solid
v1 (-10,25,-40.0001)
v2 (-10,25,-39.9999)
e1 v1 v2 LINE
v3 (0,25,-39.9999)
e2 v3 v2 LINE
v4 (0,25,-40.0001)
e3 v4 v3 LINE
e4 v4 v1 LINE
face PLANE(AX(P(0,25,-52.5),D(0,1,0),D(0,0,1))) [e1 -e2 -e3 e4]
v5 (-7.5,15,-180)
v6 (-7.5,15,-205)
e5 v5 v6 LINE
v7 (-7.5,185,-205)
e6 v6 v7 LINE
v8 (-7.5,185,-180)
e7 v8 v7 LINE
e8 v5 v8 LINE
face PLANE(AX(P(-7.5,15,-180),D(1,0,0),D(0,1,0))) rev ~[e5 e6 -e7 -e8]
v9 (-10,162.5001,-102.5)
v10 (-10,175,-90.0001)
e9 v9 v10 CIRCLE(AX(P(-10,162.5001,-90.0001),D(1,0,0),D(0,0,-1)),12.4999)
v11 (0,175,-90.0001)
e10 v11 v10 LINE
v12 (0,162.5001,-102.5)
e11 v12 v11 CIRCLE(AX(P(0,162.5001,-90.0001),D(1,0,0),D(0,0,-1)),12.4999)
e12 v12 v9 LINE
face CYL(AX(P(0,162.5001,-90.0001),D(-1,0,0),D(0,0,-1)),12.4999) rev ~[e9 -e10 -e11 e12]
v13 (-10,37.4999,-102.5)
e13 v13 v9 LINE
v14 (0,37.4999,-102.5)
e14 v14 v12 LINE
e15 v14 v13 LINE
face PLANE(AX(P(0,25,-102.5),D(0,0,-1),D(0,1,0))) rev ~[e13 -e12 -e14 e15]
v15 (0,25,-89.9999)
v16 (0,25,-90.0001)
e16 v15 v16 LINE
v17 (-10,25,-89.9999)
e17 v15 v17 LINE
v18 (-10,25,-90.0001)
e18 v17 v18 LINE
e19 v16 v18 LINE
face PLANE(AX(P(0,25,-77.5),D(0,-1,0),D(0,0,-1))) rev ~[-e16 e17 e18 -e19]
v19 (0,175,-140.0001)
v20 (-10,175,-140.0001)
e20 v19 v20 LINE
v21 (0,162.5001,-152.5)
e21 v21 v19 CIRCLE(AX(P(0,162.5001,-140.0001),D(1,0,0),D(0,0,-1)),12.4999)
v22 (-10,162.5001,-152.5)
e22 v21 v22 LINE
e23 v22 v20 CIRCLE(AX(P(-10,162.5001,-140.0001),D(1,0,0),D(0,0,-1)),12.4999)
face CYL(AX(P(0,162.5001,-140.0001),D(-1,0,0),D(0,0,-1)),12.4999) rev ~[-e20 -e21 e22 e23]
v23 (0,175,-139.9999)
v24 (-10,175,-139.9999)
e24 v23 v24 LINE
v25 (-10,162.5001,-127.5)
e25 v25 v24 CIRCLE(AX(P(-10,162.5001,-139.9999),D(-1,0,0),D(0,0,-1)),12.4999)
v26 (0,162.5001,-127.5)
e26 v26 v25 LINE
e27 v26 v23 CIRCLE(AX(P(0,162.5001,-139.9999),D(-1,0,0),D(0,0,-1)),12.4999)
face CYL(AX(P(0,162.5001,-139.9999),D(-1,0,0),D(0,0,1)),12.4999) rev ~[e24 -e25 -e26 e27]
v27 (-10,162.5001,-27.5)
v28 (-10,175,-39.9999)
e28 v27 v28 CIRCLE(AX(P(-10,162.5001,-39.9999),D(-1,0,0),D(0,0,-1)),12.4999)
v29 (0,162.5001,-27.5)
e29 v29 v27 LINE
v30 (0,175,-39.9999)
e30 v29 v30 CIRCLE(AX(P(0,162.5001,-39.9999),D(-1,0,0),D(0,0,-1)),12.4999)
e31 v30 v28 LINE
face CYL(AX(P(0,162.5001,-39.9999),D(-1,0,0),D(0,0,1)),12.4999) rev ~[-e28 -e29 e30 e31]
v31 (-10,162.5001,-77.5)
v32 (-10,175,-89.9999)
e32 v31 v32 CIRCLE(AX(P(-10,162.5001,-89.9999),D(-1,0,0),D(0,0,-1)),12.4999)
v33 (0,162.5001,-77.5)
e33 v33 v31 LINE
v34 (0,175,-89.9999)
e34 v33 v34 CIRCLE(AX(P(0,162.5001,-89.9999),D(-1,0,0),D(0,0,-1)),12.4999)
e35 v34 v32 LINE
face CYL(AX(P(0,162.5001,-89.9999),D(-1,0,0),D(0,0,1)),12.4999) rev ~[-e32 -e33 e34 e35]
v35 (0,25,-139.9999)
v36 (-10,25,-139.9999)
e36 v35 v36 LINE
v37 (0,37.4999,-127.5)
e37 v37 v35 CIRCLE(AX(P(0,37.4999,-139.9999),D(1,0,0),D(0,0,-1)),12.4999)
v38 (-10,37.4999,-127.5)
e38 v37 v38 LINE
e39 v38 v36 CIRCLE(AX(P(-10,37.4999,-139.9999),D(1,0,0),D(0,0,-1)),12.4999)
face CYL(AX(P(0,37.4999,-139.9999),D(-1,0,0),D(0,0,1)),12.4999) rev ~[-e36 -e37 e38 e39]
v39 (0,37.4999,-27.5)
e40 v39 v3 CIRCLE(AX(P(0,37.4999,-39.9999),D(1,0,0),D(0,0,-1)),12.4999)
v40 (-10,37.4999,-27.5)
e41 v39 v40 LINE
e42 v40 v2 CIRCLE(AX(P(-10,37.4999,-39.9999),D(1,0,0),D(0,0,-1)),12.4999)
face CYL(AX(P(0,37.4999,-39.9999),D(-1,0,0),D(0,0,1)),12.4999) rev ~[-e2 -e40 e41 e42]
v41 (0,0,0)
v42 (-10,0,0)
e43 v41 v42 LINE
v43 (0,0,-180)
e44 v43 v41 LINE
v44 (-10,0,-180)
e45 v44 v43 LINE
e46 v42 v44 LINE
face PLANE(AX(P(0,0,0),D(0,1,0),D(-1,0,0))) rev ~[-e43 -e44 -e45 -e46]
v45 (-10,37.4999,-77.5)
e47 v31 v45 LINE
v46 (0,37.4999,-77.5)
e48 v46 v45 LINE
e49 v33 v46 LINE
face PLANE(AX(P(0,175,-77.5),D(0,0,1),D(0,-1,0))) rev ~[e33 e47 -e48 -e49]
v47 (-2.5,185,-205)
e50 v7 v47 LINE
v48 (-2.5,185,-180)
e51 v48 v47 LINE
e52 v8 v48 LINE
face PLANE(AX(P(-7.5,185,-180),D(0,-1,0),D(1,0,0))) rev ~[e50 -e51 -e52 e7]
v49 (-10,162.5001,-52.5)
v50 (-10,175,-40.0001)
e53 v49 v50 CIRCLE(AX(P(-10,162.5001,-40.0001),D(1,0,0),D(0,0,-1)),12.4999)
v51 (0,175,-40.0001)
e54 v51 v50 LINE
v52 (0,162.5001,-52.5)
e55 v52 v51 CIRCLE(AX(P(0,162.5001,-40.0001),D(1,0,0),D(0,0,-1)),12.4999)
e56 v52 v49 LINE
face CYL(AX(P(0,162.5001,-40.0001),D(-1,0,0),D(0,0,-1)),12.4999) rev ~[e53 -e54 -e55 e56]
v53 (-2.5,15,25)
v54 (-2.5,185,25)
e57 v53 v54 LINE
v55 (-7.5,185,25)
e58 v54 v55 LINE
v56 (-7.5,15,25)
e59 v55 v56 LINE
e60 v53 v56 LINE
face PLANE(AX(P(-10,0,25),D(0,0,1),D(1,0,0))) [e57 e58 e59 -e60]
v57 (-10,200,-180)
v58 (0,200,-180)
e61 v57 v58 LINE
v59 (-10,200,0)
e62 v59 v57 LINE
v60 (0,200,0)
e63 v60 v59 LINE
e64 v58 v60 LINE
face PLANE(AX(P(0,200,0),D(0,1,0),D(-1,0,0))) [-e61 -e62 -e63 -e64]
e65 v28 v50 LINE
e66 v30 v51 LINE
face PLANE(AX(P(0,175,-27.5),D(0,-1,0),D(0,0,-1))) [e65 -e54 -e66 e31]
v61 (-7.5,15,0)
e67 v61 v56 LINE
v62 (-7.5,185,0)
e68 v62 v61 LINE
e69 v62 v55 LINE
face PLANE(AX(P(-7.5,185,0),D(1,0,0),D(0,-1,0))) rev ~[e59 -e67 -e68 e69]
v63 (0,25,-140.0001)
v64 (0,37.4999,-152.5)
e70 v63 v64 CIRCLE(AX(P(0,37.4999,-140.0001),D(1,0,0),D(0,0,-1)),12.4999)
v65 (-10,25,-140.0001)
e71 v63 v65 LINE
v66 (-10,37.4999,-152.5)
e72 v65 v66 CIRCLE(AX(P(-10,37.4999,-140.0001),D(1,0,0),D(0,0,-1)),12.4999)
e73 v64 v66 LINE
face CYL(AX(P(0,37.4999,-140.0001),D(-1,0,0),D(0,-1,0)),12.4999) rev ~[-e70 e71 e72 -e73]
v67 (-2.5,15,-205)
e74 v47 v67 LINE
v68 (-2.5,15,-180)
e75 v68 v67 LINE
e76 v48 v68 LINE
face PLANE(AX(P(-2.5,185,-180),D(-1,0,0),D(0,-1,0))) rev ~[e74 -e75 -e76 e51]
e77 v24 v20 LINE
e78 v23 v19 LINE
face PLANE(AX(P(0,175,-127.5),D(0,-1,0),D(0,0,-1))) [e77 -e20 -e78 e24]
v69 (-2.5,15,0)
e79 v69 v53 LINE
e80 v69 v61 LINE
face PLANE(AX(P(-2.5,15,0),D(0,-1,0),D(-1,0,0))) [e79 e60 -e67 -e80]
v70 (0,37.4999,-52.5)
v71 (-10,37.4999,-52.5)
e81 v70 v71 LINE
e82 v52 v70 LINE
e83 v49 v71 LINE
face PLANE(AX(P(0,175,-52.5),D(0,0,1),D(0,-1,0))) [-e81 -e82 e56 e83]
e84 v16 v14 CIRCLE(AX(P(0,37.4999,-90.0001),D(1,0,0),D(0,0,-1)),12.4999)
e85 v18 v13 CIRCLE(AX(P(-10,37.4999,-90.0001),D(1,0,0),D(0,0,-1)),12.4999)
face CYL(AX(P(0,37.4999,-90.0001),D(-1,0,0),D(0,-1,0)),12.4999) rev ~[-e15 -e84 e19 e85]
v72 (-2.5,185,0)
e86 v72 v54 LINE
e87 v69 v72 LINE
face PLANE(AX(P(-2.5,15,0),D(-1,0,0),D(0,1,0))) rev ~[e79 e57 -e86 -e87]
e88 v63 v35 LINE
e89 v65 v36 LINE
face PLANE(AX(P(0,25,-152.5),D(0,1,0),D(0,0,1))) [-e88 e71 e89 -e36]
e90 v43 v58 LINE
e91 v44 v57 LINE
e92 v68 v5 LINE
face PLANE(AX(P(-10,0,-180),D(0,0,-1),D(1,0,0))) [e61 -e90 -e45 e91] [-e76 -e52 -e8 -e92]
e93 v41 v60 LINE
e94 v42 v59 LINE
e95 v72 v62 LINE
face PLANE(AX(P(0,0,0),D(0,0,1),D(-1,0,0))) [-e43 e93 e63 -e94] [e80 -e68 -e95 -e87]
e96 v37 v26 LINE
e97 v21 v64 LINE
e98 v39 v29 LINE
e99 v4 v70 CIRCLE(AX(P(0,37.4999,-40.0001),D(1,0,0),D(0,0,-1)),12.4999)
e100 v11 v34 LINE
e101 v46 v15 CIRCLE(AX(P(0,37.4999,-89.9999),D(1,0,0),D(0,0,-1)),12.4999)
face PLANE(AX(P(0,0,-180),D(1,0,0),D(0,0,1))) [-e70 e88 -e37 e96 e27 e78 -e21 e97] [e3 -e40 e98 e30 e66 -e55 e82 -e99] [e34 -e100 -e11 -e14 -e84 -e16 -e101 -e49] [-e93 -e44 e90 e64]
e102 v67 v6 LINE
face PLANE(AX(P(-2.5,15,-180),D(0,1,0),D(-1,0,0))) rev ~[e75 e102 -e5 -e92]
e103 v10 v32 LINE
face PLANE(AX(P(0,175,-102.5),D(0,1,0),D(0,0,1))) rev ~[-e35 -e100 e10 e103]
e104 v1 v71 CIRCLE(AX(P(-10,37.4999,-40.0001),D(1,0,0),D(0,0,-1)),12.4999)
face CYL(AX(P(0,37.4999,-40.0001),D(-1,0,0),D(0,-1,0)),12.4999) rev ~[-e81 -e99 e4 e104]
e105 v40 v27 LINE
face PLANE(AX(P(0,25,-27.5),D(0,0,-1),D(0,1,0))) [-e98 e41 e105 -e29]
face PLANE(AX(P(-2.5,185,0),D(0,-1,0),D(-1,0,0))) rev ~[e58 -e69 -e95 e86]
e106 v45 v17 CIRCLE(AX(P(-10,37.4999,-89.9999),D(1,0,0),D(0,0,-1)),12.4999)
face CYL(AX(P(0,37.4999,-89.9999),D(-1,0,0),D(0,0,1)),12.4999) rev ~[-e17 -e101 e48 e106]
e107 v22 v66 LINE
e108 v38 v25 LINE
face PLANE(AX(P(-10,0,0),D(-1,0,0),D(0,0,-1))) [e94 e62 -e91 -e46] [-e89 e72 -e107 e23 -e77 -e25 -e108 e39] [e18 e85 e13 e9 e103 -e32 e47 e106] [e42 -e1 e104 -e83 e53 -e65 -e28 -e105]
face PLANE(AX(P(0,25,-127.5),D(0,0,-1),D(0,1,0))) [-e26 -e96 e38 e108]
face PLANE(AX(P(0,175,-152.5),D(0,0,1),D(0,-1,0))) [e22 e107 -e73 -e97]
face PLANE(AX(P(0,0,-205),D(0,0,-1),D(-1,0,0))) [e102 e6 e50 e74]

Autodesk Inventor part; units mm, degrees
ref_plane "YZ Plane" through (0, 0, 0) normal (1, 0, 0) x (0, 1, 0)
ref_plane "XZ Plane" through (0, 0, 0) normal (0, 1, 0) x (-1, 0, 0)
ref_plane "XY Plane" through (0, 0, 0) normal (0, 0, 1) x (1, 0, 0)
sketch "Sketch1" plane through (0, 0, 0) normal (0, 1, 0) x (-1, 0, 0)
  line L0 (0, 0) -> (10, 0)
  line L1 (10, 0) -> (10, -180)
  line L2 (10, -180) -> (0, -180)
  line L3 (0, -180) -> (0, 0)
  dimension "d0" = 10
  dimension "d1" = 180
extrude "Extrusion1" add sketch "Sketch1" along normal blind 200
sketch "Sketch2" plane through (-10, 0, 0) normal (0, 0, 1) x (1, 0, 0)
  line L0 (10, 0) -> (0, 0) projected
  line L1 (10, 200) -> (0, 200) projected
  line L2 (2.5, 0) -> (7.5, 0)
  line L3 (7.5, 0) -> (7.5, 200)
  line L4 (7.5, 200) -> (2.5, 200)
  line L5 (2.5, 200) -> (2.5, 0)
  line L6 (10, 0) -> (10, 200) projected
  line L7 (0, 200) -> (10, 200)
  line L8 (10, 200) -> (10, 185)
  line L9 (10, 185) -> (0, 185)
  line L10 (0, 185) -> (0, 200)
  line L11 (0, 0) -> (10, 0)
  line L12 (10, 0) -> (10, 15)
  line L13 (10, 15) -> (0, 15)
  line L14 (0, 15) -> (0, 0)
  point P0 (2.5, 15)
  point P1 (7.5, 15)
  point P2 (7.5, 185)
  point P3 (2.5, 185)
  dimension "d4" = 5
  dimension "d5" = 15
  dimension "d6" = 15
extrude "Extrusion2" add sketch "Sketch2" along normal blind 25 contours L13 L5 L9 L3
sketch "Sketch3" plane through (0, 0, -180) normal (0, 0, -1) x (-1, 0, 0)
  line L0 (2.5, 15) -> (7.5, 15)
  line L1 (7.5, 15) -> (7.5, 185)
  line L2 (7.5, 185) -> (2.5, 185)
  line L3 (2.5, 185) -> (2.5, 15)
  point P0 (0, 0)
  dimension "d9" = 5
  dimension "d10" = 170
extrude "Extrusion3" add sketch "Sketch3" along normal blind 25
sketch "Sketch4" plane through (0, 0, 0) normal (1, 0, 0) x (0, 0, -1)
  line L0 (27.5, 175) -> (52.5, 175)
  line L1 (52.5, 175) -> (52.5, 25)
  line L2 (52.5, 25) -> (27.5, 25)
  line L3 (27.5, 25) -> (27.5, 175)
  line L4 (77.5, 25) -> (102.5, 25)
  line L5 (102.5, 25) -> (102.5, 175)
  line L6 (102.5, 175) -> (77.5, 175)
  line L7 (77.5, 175) -> (77.5, 25)
  line L8 (127.5, 175) -> (152.5, 175)
  line L9 (152.5, 175) -> (152.5, 25)
  line L10 (152.5, 25) -> (127.5, 25)
  line L11 (127.5, 25) -> (127.5, 175)
  point P0 (0, 0)
  dimension "d13" = 25
  dimension "d14" = 150
  dimension "d15" = 25
  dimension "d16" = 25
extrude "Extrusion4" cut sketch "Sketch4" against normal blind 10
fillet "Fillet1" radius 12.5 12 edges at (-5, 175, -77.5) (-5, 175, -102.5) (-5, 175, -152.5) (-5, 175, -127.5) (-5, 175, -27.5) (-5, 175, -52.5) (-5, 25, -102.5) (-5, 25, -52.5) (-5, 25, -27.5) (-5, 25, -77.5) (-5, 25, -127.5) (-5, 25, -152.5)
properties part number "TSU_MM_Wall"
